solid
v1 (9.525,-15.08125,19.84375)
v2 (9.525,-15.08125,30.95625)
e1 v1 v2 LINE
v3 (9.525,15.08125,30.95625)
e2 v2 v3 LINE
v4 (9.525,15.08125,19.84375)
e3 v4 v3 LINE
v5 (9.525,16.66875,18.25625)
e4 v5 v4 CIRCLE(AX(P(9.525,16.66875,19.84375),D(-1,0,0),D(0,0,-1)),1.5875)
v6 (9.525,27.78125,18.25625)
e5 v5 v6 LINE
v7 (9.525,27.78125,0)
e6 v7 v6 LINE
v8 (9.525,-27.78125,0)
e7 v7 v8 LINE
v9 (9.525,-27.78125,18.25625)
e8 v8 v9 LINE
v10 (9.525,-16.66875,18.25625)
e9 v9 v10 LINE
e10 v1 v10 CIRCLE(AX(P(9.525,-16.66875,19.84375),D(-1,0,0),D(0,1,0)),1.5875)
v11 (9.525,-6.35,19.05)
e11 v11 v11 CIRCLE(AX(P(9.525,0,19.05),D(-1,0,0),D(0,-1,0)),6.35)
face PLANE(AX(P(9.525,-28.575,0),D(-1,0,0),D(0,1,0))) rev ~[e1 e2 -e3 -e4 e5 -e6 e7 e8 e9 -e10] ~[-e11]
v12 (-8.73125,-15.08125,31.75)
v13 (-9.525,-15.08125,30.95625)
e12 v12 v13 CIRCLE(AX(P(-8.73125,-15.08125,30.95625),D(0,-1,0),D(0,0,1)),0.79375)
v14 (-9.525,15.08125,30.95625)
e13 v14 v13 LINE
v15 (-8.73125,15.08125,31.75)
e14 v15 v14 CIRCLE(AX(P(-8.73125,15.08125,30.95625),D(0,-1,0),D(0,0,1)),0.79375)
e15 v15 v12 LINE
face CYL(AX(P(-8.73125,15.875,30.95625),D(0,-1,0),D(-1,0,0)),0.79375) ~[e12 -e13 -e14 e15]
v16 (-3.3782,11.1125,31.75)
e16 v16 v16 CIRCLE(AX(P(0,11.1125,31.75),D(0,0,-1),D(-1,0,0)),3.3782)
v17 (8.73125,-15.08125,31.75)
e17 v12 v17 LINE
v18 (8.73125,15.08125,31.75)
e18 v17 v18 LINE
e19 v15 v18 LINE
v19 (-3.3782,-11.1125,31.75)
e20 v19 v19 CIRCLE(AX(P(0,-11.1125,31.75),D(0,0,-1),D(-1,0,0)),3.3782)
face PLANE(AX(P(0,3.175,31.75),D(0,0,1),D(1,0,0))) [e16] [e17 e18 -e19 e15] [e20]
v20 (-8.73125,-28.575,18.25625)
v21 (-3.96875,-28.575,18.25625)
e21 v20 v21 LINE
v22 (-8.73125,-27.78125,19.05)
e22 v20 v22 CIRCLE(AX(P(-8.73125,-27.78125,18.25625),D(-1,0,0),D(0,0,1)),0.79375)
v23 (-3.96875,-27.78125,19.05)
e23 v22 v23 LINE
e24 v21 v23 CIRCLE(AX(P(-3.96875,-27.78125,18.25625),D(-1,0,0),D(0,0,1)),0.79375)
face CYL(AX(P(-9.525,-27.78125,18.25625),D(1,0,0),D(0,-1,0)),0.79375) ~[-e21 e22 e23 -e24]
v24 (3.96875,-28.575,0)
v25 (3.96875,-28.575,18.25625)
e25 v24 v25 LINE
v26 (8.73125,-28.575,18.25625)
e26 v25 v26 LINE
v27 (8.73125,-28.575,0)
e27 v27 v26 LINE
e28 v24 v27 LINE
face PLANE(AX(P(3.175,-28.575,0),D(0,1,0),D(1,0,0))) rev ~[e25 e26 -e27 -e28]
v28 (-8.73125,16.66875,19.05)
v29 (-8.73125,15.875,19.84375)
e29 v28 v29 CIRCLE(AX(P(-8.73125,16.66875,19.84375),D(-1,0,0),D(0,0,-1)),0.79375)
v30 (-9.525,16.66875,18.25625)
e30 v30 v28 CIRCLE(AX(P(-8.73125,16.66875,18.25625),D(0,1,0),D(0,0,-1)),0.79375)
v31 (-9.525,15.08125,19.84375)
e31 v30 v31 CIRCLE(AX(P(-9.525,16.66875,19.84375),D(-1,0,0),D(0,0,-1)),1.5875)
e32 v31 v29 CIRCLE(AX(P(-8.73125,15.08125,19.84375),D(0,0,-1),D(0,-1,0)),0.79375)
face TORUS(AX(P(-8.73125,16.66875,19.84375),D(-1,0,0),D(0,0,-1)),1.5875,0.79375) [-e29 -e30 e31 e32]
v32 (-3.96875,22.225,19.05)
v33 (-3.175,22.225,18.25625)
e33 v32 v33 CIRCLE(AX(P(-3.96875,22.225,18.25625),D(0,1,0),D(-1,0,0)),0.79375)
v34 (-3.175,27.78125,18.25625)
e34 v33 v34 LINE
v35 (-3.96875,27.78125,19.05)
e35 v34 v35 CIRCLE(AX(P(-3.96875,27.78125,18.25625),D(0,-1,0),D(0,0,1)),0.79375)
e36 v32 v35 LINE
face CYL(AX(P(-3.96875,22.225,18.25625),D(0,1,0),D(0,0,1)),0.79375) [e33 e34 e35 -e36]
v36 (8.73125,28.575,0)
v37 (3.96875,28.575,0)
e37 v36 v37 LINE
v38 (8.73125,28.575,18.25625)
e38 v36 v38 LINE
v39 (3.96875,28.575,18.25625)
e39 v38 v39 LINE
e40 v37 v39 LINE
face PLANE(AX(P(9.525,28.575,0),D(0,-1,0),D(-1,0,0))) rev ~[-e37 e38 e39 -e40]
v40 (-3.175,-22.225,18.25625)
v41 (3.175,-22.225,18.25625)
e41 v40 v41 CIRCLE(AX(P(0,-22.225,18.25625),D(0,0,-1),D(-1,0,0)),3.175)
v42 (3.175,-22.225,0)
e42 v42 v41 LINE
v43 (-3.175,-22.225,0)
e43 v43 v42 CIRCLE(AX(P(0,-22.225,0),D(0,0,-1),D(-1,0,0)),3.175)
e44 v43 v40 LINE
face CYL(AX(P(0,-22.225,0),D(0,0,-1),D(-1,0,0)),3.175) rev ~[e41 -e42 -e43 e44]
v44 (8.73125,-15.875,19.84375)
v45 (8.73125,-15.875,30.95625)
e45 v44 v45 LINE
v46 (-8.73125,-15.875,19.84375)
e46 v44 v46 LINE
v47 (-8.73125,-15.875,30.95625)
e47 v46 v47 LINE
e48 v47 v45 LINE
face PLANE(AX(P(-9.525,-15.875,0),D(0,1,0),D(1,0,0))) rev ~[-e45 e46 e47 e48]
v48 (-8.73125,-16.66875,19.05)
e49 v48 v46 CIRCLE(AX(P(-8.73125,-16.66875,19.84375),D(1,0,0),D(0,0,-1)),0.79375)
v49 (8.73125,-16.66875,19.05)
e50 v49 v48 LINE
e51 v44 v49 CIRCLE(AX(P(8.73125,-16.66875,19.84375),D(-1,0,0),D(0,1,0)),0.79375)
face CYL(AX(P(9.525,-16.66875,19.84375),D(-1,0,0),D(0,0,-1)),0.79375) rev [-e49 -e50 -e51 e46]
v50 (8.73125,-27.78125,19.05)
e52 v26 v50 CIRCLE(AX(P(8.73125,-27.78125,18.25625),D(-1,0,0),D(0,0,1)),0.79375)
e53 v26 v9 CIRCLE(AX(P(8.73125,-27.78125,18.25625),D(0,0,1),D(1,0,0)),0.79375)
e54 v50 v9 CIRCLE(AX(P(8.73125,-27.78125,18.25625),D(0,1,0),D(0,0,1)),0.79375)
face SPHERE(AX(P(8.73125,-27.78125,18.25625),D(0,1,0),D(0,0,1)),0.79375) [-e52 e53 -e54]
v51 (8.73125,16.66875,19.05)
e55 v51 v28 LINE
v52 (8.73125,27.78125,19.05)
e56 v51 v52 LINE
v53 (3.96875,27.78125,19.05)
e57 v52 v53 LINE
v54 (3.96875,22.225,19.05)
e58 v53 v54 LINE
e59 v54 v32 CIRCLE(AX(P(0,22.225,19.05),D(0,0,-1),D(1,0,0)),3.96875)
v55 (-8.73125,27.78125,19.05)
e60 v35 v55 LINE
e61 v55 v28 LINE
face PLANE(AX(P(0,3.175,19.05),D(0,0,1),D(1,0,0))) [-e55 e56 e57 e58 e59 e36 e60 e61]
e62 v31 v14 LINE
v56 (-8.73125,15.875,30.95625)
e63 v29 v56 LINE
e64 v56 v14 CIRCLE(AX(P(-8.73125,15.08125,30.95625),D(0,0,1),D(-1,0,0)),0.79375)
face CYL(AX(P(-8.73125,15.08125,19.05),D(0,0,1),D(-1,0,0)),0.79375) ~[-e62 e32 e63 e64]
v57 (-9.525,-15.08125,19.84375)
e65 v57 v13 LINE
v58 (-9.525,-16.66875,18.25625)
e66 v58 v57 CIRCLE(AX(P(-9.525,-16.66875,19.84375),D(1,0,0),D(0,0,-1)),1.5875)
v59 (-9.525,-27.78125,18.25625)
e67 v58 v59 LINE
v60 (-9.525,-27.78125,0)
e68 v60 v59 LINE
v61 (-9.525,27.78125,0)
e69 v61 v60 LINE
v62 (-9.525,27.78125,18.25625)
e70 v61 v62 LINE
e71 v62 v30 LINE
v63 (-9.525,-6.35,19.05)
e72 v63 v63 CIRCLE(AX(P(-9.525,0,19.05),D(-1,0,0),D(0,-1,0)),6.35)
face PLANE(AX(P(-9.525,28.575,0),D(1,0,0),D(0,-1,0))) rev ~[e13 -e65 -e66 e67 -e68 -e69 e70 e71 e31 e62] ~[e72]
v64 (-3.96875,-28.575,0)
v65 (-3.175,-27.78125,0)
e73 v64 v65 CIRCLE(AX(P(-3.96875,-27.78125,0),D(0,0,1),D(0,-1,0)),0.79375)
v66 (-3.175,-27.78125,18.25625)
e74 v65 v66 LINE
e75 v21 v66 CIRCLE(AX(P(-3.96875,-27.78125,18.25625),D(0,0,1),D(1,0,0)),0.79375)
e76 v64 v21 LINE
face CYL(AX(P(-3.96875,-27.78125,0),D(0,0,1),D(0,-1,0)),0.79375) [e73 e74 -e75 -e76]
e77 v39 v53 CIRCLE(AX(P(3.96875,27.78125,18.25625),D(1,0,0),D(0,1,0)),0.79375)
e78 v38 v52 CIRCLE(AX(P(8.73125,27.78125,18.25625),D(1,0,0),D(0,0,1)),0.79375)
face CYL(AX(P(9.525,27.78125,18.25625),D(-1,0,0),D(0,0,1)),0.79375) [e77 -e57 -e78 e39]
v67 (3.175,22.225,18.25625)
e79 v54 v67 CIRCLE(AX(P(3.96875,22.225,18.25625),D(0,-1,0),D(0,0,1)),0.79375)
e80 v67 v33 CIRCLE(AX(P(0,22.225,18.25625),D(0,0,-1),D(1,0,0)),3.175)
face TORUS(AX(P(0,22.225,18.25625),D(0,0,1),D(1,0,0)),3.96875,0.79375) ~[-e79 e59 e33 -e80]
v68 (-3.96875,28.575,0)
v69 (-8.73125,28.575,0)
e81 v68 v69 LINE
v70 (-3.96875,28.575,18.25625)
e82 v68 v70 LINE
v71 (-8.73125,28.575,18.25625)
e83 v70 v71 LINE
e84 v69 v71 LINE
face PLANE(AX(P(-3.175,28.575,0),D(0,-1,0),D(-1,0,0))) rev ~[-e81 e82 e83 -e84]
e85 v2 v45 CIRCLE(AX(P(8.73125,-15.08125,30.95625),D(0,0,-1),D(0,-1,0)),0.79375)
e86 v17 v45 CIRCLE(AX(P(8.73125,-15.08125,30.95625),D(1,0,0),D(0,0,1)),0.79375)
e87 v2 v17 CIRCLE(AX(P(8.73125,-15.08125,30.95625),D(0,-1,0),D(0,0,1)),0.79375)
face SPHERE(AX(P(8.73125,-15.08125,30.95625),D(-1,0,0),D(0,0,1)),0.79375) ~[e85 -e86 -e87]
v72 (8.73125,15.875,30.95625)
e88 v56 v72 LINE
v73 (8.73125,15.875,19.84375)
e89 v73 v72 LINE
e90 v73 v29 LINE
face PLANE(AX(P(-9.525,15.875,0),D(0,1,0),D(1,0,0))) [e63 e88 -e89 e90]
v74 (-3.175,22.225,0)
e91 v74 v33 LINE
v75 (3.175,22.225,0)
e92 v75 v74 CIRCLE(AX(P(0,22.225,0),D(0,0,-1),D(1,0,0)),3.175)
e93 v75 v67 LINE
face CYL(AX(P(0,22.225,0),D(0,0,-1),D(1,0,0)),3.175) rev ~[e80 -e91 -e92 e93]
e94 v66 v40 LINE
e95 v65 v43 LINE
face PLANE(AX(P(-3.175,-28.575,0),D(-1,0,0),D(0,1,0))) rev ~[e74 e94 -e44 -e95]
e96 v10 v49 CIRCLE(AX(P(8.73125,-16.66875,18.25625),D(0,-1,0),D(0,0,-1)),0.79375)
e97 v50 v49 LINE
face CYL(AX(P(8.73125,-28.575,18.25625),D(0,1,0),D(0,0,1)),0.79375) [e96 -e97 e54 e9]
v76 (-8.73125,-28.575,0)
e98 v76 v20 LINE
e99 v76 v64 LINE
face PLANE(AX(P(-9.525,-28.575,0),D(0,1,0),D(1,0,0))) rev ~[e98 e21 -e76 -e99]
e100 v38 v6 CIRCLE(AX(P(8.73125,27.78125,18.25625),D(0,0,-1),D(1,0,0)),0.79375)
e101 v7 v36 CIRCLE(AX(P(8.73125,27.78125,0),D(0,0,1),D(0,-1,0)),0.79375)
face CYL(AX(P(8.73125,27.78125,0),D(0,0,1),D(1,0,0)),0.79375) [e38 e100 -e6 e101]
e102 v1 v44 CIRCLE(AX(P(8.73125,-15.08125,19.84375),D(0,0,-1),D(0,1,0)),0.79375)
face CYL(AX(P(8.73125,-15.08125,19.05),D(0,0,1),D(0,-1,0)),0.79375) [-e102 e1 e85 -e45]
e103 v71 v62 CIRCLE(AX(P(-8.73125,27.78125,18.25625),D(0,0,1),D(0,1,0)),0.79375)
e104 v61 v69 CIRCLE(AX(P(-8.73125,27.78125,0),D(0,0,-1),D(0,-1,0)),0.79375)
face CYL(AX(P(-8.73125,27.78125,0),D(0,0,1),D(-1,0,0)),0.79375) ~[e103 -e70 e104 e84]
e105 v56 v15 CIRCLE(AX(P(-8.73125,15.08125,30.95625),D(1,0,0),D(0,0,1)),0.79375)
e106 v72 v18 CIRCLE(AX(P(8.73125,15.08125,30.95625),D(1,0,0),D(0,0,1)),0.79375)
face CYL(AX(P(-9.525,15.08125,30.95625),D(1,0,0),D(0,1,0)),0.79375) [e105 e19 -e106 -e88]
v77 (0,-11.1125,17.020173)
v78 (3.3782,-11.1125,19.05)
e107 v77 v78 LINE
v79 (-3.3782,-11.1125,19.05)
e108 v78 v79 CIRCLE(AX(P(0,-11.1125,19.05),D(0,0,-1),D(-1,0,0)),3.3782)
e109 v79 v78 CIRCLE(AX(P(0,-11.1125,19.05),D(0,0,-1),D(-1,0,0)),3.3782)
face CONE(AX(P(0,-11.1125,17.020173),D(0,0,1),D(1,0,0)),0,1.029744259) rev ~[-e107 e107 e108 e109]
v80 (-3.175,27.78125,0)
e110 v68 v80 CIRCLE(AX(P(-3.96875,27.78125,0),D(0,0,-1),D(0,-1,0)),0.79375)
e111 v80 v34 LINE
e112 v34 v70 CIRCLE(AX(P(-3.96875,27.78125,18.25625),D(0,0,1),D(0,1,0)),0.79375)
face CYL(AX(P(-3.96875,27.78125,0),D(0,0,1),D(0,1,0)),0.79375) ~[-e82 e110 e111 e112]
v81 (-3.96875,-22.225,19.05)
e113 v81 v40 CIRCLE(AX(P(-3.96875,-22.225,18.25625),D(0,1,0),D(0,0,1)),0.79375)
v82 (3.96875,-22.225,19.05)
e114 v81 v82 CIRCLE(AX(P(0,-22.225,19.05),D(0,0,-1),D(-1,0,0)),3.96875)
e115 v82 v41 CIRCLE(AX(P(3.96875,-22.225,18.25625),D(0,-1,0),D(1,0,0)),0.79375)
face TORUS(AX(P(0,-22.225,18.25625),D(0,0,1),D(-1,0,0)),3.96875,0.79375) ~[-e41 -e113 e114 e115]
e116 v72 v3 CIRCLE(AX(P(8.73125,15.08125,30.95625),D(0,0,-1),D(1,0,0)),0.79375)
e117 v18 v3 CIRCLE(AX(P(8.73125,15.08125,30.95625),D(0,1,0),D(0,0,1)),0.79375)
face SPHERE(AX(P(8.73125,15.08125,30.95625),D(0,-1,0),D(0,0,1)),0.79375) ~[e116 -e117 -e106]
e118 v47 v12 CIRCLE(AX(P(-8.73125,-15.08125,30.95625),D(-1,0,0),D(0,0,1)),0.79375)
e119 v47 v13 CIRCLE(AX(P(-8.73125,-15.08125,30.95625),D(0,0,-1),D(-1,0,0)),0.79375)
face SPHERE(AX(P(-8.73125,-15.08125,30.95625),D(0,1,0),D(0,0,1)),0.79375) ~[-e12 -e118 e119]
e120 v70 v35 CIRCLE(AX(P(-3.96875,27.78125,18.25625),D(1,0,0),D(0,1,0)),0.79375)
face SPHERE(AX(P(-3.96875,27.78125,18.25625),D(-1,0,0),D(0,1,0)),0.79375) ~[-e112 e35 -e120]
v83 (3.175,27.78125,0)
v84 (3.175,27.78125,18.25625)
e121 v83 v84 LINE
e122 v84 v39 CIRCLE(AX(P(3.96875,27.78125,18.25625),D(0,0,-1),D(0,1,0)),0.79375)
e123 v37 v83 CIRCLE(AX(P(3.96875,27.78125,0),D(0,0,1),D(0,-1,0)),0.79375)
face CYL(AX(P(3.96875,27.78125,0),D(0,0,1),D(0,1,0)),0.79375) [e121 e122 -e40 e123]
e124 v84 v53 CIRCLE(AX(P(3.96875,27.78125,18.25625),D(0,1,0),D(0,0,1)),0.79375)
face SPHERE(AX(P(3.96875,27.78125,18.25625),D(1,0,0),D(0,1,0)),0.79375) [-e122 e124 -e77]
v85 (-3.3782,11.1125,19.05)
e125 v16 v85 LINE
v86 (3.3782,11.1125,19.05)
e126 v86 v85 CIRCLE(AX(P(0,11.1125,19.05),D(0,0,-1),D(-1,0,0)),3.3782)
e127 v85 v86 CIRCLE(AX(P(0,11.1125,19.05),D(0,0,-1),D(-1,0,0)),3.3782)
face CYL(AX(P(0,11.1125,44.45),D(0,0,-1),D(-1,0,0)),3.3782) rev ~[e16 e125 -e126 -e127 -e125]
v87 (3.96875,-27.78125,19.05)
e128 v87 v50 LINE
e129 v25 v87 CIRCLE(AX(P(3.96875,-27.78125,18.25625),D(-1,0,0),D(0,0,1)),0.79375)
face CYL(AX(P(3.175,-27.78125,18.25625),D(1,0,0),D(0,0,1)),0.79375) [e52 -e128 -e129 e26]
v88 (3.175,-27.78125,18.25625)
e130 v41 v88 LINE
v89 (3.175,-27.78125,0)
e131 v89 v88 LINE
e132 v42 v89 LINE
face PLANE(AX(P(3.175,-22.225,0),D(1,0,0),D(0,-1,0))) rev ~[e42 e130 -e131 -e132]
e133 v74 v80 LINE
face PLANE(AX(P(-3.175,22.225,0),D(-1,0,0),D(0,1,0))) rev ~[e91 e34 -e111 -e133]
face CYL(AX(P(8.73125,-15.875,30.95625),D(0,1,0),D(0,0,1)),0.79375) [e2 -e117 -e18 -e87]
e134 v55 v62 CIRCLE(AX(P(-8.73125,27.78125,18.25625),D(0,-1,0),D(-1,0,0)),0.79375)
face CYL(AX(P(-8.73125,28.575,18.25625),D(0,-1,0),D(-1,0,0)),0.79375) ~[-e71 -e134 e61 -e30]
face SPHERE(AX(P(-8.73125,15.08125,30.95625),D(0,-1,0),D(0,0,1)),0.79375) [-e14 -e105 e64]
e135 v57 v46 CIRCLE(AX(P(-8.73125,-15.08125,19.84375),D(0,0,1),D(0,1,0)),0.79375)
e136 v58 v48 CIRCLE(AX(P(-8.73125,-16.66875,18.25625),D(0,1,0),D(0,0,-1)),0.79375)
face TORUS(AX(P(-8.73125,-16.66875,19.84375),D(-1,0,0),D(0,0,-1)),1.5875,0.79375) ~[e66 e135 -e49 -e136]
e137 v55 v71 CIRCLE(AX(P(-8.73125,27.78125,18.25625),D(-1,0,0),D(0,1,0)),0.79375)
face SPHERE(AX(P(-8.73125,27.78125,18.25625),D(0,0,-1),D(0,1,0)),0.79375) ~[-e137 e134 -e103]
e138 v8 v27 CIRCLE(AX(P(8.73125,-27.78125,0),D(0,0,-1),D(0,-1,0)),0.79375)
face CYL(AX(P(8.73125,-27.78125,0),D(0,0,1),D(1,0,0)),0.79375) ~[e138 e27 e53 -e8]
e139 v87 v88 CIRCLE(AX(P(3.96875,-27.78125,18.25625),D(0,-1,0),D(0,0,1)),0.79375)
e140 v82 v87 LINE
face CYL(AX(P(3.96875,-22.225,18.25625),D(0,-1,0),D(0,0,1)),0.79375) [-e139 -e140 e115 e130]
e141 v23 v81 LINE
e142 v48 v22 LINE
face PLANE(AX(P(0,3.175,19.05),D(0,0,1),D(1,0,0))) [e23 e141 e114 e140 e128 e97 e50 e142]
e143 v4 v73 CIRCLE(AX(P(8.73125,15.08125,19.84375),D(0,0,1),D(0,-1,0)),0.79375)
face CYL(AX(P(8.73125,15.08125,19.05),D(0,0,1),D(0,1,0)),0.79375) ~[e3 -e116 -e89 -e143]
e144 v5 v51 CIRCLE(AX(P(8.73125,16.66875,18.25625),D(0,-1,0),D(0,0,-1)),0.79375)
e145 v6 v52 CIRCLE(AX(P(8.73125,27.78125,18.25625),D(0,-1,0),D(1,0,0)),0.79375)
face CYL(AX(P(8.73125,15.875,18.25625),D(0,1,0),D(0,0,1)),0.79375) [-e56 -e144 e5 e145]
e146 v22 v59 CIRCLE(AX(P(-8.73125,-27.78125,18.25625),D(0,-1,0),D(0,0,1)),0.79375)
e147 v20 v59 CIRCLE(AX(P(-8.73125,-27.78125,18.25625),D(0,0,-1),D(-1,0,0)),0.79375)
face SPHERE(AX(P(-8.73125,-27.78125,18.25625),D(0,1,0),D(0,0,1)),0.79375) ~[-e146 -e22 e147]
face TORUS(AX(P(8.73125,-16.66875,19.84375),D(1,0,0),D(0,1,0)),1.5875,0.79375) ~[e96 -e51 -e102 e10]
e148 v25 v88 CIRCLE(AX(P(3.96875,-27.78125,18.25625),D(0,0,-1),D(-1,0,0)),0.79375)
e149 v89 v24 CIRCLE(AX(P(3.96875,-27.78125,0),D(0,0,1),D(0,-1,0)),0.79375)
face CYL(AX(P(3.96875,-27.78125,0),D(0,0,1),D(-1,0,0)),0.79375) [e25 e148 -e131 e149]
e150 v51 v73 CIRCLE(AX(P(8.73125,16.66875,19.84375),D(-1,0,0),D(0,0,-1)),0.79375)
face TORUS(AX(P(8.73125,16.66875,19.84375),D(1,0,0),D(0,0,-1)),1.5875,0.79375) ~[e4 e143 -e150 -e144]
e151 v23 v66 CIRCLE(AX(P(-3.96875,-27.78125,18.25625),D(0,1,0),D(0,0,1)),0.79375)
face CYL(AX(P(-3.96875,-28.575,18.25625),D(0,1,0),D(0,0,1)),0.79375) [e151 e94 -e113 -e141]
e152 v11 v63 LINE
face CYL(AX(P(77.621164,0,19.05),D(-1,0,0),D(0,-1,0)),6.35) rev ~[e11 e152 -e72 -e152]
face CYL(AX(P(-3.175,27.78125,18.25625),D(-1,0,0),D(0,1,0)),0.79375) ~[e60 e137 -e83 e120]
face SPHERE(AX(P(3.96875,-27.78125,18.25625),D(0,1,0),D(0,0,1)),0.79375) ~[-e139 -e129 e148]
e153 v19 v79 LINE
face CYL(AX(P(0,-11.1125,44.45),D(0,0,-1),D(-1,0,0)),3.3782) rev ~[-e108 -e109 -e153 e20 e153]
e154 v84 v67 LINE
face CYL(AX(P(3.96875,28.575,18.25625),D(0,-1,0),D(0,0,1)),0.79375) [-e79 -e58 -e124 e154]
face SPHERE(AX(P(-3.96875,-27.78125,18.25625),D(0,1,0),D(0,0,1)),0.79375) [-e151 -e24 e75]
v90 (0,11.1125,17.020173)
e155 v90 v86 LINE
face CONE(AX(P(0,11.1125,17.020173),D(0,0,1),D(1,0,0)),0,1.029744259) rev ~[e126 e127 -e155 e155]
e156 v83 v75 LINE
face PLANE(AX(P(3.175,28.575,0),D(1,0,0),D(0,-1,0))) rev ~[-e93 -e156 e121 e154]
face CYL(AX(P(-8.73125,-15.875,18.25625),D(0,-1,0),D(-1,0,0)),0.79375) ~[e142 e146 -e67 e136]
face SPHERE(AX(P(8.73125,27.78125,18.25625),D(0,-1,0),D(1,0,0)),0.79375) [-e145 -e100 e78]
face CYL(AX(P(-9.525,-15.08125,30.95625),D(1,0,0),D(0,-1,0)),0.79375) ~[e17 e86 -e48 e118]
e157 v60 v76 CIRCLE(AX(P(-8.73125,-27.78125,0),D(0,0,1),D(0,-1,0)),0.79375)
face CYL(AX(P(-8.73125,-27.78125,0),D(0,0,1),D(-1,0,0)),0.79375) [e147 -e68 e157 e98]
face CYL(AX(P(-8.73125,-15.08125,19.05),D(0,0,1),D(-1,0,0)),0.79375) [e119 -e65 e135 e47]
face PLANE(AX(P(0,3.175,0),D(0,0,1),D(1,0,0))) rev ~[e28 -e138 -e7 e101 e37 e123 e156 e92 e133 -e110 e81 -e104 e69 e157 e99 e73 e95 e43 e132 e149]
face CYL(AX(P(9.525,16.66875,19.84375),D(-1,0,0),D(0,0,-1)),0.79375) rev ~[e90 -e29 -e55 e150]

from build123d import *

# Parameters (mm, degrees)
F0_W     = 19.05
F0_H     = 6.35
F0_H_2   = 15.875
F0_R     = 3.571875
F0_H_3   = 9.525
F1_DEPTH = 19.05
F2_DEPTH = 31.75
F4_D     = 12.7
F6_D     = 6.7564
F6_DEPTH = 12.7
F6_TIP   = 2.0298273432
F7_R     = 0.79375


with BuildPart() as f1:
    # F0 (on Top) → F1 (new body)
    with BuildSketch(Plane.XY):
        with Locations((0, 3.175)):
            Rectangle(F0_W, F0_H)
        with BuildLine():
            Line((9.525, -28.575), (9.525, -15.875))
            Line((9.525, -15.875), (-9.525, -15.875))
            Line((-9.525, -15.875), (-9.525, -28.575))
            Line((-9.525, -28.575), (-3.175, -28.575))
            Line((-3.175, -28.575), (-3.175, -22.225))
            ThreePointArc((-3.175, -22.225), (0, -19.05), (3.175, -22.225))
            Line((3.175, -22.225), (3.175, -28.575))
            Line((3.175, -28.575), (9.525, -28.575))
        make_face()
        with Locations((0, -7.9375)):
            Rectangle(F0_W, F0_H_2)
        with Locations((0, -11.1125)):
            Circle(F0_R, mode=Mode.SUBTRACT)
        with Locations((0, 11.1125)):
            Rectangle(F0_W, F0_H_3)
        with Locations((0, 11.1125)):
            Circle(F0_R, mode=Mode.SUBTRACT)
        with BuildLine():
            Line((9.525, 15.875), (9.525, 28.575))
            Line((9.525, 28.575), (3.175, 28.575))
            Line((3.175, 28.575), (3.175, 22.225))
            ThreePointArc((3.175, 22.225), (0, 19.05), (-3.175, 22.225))
            Line((-3.175, 22.225), (-3.175, 28.575))
            Line((-3.175, 28.575), (-9.525, 28.575))
            Line((-9.525, 28.575), (-9.525, 15.875))
            Line((-9.525, 15.875), (9.525, 15.875))
        make_face()
        with Locations((0, 11.1125)):
            Circle(F0_R)
        with Locations((0, -11.1125)):
            Circle(F0_R)
    extrude(amount=F1_DEPTH)

    # F0 (on Top) → F2 (join)
    with BuildSketch(Plane.XY):
        with Locations((0, 3.175)):
            Rectangle(F0_W, F0_H)
        with Locations((0, -7.9375)):
            Rectangle(F0_W, F0_H_2)
        with Locations((0, -11.1125)):
            Circle(F0_R, mode=Mode.SUBTRACT)
        with Locations((0, 11.1125)):
            Rectangle(F0_W, F0_H_3)
        with Locations((0, 11.1125)):
            Circle(F0_R, mode=Mode.SUBTRACT)
        with Locations((0, -11.1125)):
            Circle(F0_R)
        with Locations((0, 11.1125)):
            Circle(F0_R)
    extrude(amount=F2_DEPTH)

    # F4 (through all)
    with Locations(Plane.YZ.offset(9.525)):
        with Locations((0, 19.05)):
            Hole(F4_D / 2)

    # F6
    with Locations(Plane.XY.offset(31.75)):
        with Locations((0, 11.1125), (0, -11.1125)):
            Hole(F6_D / 2, depth=F6_DEPTH)
            with Locations((0, 0, -(F6_DEPTH + F6_TIP / 2))):  # 118° drill point
                Cone(0, F6_D / 2, F6_TIP, mode=Mode.SUBTRACT)

    # F7
    f7_edges = [f1.edges().sort_by_distance(p)[0] for p in [
        (-9.525, 0, 31.75),
        (0, -15.875, 31.75),
        (9.525, 0, 31.75),
        (0, 15.875, 31.75),
        (9.525, 15.875, 25.4),
        (-9.525, 15.875, 25.4),
        (0, 15.875, 19.05),
        (9.525, 22.225, 19.05),
        (9.525, 28.575, 9.525),
        (-9.525, 28.575, 9.525),
        (6.35, 28.575, 19.05),
        (-6.35, 28.575, 19.05),
        (3.175, 28.575, 9.525),
        (-3.175, 28.575, 9.525),
        (3.175, 25.4, 19.05),
        (0, -15.875, 19.05),
        (9.525, -15.875, 25.4),
        (9.525, -22.225, 19.05),
        (-9.525, -22.225, 19.05),
        (-9.525, -15.875, 25.4),
        (-3.175, -25.4, 19.05),
        (6.35, -28.575, 19.05),
        (-6.35, -28.575, 19.05),
        (9.525, -28.575, 9.525),
        (-9.525, -28.575, 9.525),
        (3.175, -28.575, 9.525),
        (-3.175, -28.575, 9.525),
        (-9.525, 22.225, 19.05),
        (3.175, -25.4, 19.05),
        (0, -19.05, 19.05),
        (-3.175, 25.4, 19.05),
        (0, 19.05, 19.05),
    ]]
    fillet(f7_edges, radius=F7_R)


solid = f1.part
